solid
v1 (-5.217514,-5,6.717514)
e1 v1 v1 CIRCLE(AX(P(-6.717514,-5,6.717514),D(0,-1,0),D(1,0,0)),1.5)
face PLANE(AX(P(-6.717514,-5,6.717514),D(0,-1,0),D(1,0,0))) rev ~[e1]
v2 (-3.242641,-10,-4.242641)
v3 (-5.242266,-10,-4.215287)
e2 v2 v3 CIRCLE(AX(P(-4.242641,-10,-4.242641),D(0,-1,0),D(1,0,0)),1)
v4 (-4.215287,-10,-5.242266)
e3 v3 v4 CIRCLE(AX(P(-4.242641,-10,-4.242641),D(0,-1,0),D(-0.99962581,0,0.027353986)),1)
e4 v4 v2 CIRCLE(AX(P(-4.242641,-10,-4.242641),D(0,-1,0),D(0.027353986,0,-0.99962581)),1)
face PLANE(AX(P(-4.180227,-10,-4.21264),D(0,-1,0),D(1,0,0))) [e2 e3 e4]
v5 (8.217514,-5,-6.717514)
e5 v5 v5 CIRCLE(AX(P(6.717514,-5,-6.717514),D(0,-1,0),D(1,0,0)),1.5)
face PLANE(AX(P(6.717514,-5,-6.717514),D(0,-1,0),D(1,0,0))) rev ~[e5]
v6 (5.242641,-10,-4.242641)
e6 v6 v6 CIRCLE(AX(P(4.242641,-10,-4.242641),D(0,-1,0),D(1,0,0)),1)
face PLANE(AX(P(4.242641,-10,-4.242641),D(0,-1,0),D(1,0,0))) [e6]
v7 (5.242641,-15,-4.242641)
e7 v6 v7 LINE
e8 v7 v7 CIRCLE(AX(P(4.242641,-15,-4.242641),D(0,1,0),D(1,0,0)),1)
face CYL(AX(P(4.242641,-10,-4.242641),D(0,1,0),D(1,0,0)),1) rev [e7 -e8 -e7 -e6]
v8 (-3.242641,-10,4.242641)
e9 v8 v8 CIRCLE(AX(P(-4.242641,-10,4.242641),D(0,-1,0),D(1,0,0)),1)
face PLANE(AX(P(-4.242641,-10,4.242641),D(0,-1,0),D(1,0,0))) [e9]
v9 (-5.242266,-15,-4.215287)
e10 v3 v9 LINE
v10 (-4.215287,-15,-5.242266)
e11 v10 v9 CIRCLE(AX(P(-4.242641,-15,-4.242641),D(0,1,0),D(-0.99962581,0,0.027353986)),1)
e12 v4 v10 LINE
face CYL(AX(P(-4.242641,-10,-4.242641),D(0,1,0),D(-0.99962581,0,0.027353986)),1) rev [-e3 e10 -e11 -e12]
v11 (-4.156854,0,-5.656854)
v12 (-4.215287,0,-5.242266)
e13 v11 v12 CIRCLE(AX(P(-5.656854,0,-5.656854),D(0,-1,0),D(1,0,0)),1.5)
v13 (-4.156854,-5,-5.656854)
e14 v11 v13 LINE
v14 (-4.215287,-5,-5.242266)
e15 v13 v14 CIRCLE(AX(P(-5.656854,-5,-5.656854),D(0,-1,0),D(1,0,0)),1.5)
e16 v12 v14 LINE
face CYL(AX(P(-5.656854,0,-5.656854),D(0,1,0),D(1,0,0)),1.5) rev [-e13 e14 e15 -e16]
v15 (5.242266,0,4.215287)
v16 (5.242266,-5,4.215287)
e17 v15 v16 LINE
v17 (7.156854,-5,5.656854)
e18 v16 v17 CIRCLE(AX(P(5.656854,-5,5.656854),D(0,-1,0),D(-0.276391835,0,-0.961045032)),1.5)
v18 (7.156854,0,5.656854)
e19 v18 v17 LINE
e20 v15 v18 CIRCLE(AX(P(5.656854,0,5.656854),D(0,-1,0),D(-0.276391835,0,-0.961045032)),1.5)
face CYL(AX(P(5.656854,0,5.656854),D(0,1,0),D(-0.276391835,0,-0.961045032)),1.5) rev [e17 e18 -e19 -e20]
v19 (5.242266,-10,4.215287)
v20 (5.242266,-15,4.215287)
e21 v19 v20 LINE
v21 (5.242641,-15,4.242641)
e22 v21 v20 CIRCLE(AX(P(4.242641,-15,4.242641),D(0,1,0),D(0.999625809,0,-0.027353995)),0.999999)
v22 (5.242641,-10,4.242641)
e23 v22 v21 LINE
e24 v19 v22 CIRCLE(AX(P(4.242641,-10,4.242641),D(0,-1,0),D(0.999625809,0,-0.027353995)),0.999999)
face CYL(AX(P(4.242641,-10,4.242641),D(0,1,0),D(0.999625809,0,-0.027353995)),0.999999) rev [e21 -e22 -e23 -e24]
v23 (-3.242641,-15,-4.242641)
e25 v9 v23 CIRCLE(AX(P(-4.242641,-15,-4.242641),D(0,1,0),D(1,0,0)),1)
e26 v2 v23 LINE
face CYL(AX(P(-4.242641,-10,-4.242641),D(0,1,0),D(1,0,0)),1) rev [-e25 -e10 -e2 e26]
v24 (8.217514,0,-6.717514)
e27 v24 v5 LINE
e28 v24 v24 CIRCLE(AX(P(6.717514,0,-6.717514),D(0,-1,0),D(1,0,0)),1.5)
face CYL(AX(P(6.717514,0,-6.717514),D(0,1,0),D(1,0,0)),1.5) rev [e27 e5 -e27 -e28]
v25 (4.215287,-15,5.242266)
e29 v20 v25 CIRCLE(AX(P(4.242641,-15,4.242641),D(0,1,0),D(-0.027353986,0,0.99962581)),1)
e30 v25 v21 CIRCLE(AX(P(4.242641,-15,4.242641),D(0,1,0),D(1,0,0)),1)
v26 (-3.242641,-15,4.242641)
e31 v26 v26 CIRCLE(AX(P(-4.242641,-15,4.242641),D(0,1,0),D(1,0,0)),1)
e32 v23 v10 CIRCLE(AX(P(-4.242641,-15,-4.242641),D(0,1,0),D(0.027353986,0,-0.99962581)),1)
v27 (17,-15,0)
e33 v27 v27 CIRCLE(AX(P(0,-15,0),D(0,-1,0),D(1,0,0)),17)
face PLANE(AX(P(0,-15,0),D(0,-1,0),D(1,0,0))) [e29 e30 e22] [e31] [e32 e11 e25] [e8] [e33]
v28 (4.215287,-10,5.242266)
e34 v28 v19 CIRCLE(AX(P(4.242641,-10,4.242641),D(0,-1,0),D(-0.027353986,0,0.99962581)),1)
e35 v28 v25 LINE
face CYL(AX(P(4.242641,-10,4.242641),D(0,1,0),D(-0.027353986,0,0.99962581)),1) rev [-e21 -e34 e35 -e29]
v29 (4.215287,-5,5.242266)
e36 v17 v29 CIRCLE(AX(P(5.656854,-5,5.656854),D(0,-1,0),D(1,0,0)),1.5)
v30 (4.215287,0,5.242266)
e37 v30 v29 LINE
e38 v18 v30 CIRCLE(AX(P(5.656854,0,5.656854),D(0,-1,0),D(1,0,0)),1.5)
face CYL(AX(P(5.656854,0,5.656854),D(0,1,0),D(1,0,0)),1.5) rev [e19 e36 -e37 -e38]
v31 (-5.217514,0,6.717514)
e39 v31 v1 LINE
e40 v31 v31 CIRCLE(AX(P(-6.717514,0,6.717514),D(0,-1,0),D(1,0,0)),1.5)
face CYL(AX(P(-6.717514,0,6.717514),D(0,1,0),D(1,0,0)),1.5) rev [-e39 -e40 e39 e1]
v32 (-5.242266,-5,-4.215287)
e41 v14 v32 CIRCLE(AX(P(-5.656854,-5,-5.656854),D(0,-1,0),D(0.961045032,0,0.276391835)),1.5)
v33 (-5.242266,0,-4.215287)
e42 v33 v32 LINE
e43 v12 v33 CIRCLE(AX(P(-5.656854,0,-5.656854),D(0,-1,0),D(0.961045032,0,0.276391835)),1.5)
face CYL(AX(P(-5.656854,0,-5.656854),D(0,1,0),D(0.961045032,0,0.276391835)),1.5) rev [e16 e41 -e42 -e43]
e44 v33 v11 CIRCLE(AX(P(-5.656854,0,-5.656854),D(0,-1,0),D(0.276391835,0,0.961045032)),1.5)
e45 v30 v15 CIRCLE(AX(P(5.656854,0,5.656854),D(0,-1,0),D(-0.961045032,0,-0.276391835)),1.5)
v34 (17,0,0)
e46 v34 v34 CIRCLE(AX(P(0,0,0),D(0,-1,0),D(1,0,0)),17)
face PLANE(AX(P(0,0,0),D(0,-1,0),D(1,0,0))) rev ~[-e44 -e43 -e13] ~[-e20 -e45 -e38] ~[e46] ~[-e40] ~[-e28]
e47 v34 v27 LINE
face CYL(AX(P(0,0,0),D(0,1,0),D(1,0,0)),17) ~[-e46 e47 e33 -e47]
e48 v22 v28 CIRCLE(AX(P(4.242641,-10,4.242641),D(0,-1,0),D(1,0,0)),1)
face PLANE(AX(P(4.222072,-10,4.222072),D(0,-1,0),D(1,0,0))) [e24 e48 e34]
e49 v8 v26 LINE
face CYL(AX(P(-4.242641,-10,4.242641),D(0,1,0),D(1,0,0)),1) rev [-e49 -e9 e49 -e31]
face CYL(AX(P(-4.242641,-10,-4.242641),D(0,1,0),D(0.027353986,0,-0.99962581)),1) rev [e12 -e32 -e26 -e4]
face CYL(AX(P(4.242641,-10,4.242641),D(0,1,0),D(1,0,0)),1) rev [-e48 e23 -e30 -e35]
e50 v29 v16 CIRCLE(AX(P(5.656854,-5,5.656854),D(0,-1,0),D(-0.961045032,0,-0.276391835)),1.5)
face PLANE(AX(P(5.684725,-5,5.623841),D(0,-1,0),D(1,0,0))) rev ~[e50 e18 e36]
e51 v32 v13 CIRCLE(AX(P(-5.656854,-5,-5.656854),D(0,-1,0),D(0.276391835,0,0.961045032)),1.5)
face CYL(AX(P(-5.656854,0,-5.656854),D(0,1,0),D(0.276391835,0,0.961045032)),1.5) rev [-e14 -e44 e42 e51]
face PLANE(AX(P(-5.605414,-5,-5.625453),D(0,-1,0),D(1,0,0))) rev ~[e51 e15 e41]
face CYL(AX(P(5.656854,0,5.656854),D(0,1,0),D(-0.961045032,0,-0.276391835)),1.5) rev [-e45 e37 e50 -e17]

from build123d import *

# Parameters (mm, degrees)
F0_R     = 17
F0_R_2   = 1.5
F0_R_3   = 1
F1_DEPTH = 15
F2_START = 10
F2_DEPTH = 15
F3_DEPTH = 5


# Not quite as in the source:
# - a feature names something its author has since deleted; it is built from what else it names


with BuildPart() as f1:
    # F0 (on Front) → F1 (new body)
    with BuildSketch(Plane.XZ):
        Circle(F0_R)
        with BuildLine():
            ThreePointArc((-4.2152867015, -5.2422664968), (-4.1715341961, -5.447511614), (-4.1568542495, -5.6568542495))
            ThreePointArc((-4.1568542495, -5.6568542495), (-6.8551617286, -6.5591065343), (-5.2422664968, -4.2152867015))
            ThreePointArc((-5.2422664968, -4.2152867015), (-4.2289624147, -3.2427342391), (-3.2426406871, -4.2426406871))
            ThreePointArc((-3.2426406871, -4.2426406871), (-3.525928058, -4.9400093179), (-4.2152867015, -5.2422664968))
        make_face(mode=Mode.SUBTRACT)
        with Locations((6.7175144213, -6.7175144213)):
            Circle(F0_R_2, mode=Mode.SUBTRACT)
        with Locations((4.2426406871, -4.2426406871)):
            Circle(F0_R_3, mode=Mode.SUBTRACT)
        with Locations((-4.2426406871, 4.2426406871)):
            Circle(F0_R_3, mode=Mode.SUBTRACT)
        with Locations((-6.7175144213, 6.7175144213)):
            Circle(F0_R_2, mode=Mode.SUBTRACT)
        with BuildLine():
            ThreePointArc((4.2152867015, 5.2422664968), (5.447511614, 7.1421743029), (7.1568542495, 5.6568542495))
            ThreePointArc((7.1568542495, 5.6568542495), (6.5591065343, 4.4585467704), (5.2422664968, 4.2152867015))
            ThreePointArc((5.2422664968, 4.2152867015), (3.5355339059, 3.5355339059), (4.2152867015, 5.2422664968))
        make_face(mode=Mode.SUBTRACT)
        with BuildLine():
            ThreePointArc((5.2422664968, 4.2152867015), (6.5591065343, 4.4585467704), (7.1568542495, 5.6568542495))
            ThreePointArc((7.1568542495, 5.6568542495), (5.447511614, 7.1421743029), (4.2152867015, 5.2422664968))
            ThreePointArc((4.2152867015, 5.2422664968), (4.9400093179, 4.9593533163), (5.2426406871, 4.2426406871))
            ThreePointArc((5.2426406871, 4.2426406871), (5.2425471352, 4.2289624147), (5.2422664968, 4.2152867015))
        make_face()
        with BuildLine():
            ThreePointArc((5.2422664968, 4.2152867015), (4.5961940777, 4.5961940777), (4.2152867015, 5.2422664968))
            ThreePointArc((4.2152867015, 5.2422664968), (3.5355339059, 3.5355339059), (5.2422664968, 4.2152867015))
        make_face()
        with BuildLine():
            ThreePointArc((-5.2422664968, -4.2152867015), (-6.8551617286, -6.5591065343), (-4.1568542495, -5.6568542495))
            ThreePointArc((-4.1568542495, -5.6568542495), (-4.1715341961, -5.447511614), (-4.2152867015, -5.2422664968))
            ThreePointArc((-4.2152867015, -5.2422664968), (-4.9497474683, -4.9497474683), (-5.2422664968, -4.2152867015))
        make_face()
        with BuildLine():
            ThreePointArc((-5.2422664968, -4.2152867015), (-4.9497474683, -4.9497474683), (-4.2152867015, -5.2422664968))
            ThreePointArc((-4.2152867015, -5.2422664968), (-4.5961940777, -4.5961940777), (-5.2422664968, -4.2152867015))
        make_face()
        with BuildLine():
            ThreePointArc((-5.2422664968, -4.2152867015), (-4.5961940777, -4.5961940777), (-4.2152867015, -5.2422664968))
            ThreePointArc((-4.2152867015, -5.2422664968), (-3.525928058, -4.9400093179), (-3.2426406871, -4.2426406871))
            ThreePointArc((-3.2426406871, -4.2426406871), (-4.2289624147, -3.2427342391), (-5.2422664968, -4.2152867015))
        make_face()
        with BuildLine():
            ThreePointArc((5.2426406871, 4.2426406871), (4.9400093179, 4.9593533163), (4.2152867015, 5.2422664968))
            ThreePointArc((4.2152867015, 5.2422664968), (4.5961940777, 4.5961940777), (5.2422664968, 4.2152867015))
            ThreePointArc((5.2422664968, 4.2152867015), (5.2425471352, 4.2289624147), (5.2426406871, 4.2426406871))
        make_face()
        with Locations((4.2426406871, -4.2426406871)):
            Circle(F0_R_3)
        with Locations((-4.2426406871, 4.2426406871)):
            Circle(F0_R_3)
        with Locations((-6.7175144213, 6.7175144213)):
            Circle(F0_R_2)
        with Locations((6.7175144213, -6.7175144213)):
            Circle(F0_R_2)
    extrude(amount=F1_DEPTH)

    # F0 (on Front) → F2 (cut)
    with BuildSketch(Plane.XZ.offset(F2_START)):
        with BuildLine():
            ThreePointArc((-5.2422664968, -4.2152867015), (-4.5961940777, -4.5961940777), (-4.2152867015, -5.2422664968))
            ThreePointArc((-4.2152867015, -5.2422664968), (-3.525928058, -4.9400093179), (-3.2426406871, -4.2426406871))
            ThreePointArc((-3.2426406871, -4.2426406871), (-4.2289624147, -3.2427342391), (-5.2422664968, -4.2152867015))
        make_face()
        with BuildLine():
            ThreePointArc((-5.2422664968, -4.2152867015), (-4.9497474683, -4.9497474683), (-4.2152867015, -5.2422664968))
            ThreePointArc((-4.2152867015, -5.2422664968), (-4.5961940777, -4.5961940777), (-5.2422664968, -4.2152867015))
        make_face()
        with Locations((4.2426406871, -4.2426406871)):
            Circle(F0_R_3)
        with BuildLine():
            ThreePointArc((5.2422664968, 4.2152867015), (4.5961940777, 4.5961940777), (4.2152867015, 5.2422664968))
            ThreePointArc((4.2152867015, 5.2422664968), (3.5355339059, 3.5355339059), (5.2422664968, 4.2152867015))
        make_face()
        with BuildLine():
            ThreePointArc((5.2426406871, 4.2426406871), (4.9400093179, 4.9593533163), (4.2152867015, 5.2422664968))
            ThreePointArc((4.2152867015, 5.2422664968), (4.5961940777, 4.5961940777), (5.2422664968, 4.2152867015))
            ThreePointArc((5.2422664968, 4.2152867015), (5.2425471352, 4.2289624147), (5.2426406871, 4.2426406871))
        make_face()
        with Locations((-4.2426406871, 4.2426406871)):
            Circle(F0_R_3)
    extrude(amount=F2_DEPTH, mode=Mode.SUBTRACT)

    # F0 (on Front) → F3 (cut)
    with BuildSketch(Plane.XZ):
        with BuildLine():
            ThreePointArc((5.2422664968, 4.2152867015), (6.5591065343, 4.4585467704), (7.1568542495, 5.6568542495))
            ThreePointArc((7.1568542495, 5.6568542495), (5.447511614, 7.1421743029), (4.2152867015, 5.2422664968))
            ThreePointArc((4.2152867015, 5.2422664968), (4.9400093179, 4.9593533163), (5.2426406871, 4.2426406871))
            ThreePointArc((5.2426406871, 4.2426406871), (5.2425471352, 4.2289624147), (5.2422664968, 4.2152867015))
        make_face()
        with BuildLine():
            ThreePointArc((5.2426406871, 4.2426406871), (4.9400093179, 4.9593533163), (4.2152867015, 5.2422664968))
            ThreePointArc((4.2152867015, 5.2422664968), (4.5961940777, 4.5961940777), (5.2422664968, 4.2152867015))
            ThreePointArc((5.2422664968, 4.2152867015), (5.2425471352, 4.2289624147), (5.2426406871, 4.2426406871))
        make_face()
        with BuildLine():
            ThreePointArc((-5.2422664968, -4.2152867015), (-6.8551617286, -6.5591065343), (-4.1568542495, -5.6568542495))
            ThreePointArc((-4.1568542495, -5.6568542495), (-4.1715341961, -5.447511614), (-4.2152867015, -5.2422664968))
            ThreePointArc((-4.2152867015, -5.2422664968), (-4.9497474683, -4.9497474683), (-5.2422664968, -4.2152867015))
        make_face()
        with BuildLine():
            ThreePointArc((-5.2422664968, -4.2152867015), (-4.9497474683, -4.9497474683), (-4.2152867015, -5.2422664968))
            ThreePointArc((-4.2152867015, -5.2422664968), (-4.5961940777, -4.5961940777), (-5.2422664968, -4.2152867015))
        make_face()
        with Locations((6.7175144213, -6.7175144213)):
            Circle(F0_R_2)
        with Locations((-6.7175144213, 6.7175144213)):
            Circle(F0_R_2)
    extrude(amount=F3_DEPTH, mode=Mode.SUBTRACT)


solid = f1.part
